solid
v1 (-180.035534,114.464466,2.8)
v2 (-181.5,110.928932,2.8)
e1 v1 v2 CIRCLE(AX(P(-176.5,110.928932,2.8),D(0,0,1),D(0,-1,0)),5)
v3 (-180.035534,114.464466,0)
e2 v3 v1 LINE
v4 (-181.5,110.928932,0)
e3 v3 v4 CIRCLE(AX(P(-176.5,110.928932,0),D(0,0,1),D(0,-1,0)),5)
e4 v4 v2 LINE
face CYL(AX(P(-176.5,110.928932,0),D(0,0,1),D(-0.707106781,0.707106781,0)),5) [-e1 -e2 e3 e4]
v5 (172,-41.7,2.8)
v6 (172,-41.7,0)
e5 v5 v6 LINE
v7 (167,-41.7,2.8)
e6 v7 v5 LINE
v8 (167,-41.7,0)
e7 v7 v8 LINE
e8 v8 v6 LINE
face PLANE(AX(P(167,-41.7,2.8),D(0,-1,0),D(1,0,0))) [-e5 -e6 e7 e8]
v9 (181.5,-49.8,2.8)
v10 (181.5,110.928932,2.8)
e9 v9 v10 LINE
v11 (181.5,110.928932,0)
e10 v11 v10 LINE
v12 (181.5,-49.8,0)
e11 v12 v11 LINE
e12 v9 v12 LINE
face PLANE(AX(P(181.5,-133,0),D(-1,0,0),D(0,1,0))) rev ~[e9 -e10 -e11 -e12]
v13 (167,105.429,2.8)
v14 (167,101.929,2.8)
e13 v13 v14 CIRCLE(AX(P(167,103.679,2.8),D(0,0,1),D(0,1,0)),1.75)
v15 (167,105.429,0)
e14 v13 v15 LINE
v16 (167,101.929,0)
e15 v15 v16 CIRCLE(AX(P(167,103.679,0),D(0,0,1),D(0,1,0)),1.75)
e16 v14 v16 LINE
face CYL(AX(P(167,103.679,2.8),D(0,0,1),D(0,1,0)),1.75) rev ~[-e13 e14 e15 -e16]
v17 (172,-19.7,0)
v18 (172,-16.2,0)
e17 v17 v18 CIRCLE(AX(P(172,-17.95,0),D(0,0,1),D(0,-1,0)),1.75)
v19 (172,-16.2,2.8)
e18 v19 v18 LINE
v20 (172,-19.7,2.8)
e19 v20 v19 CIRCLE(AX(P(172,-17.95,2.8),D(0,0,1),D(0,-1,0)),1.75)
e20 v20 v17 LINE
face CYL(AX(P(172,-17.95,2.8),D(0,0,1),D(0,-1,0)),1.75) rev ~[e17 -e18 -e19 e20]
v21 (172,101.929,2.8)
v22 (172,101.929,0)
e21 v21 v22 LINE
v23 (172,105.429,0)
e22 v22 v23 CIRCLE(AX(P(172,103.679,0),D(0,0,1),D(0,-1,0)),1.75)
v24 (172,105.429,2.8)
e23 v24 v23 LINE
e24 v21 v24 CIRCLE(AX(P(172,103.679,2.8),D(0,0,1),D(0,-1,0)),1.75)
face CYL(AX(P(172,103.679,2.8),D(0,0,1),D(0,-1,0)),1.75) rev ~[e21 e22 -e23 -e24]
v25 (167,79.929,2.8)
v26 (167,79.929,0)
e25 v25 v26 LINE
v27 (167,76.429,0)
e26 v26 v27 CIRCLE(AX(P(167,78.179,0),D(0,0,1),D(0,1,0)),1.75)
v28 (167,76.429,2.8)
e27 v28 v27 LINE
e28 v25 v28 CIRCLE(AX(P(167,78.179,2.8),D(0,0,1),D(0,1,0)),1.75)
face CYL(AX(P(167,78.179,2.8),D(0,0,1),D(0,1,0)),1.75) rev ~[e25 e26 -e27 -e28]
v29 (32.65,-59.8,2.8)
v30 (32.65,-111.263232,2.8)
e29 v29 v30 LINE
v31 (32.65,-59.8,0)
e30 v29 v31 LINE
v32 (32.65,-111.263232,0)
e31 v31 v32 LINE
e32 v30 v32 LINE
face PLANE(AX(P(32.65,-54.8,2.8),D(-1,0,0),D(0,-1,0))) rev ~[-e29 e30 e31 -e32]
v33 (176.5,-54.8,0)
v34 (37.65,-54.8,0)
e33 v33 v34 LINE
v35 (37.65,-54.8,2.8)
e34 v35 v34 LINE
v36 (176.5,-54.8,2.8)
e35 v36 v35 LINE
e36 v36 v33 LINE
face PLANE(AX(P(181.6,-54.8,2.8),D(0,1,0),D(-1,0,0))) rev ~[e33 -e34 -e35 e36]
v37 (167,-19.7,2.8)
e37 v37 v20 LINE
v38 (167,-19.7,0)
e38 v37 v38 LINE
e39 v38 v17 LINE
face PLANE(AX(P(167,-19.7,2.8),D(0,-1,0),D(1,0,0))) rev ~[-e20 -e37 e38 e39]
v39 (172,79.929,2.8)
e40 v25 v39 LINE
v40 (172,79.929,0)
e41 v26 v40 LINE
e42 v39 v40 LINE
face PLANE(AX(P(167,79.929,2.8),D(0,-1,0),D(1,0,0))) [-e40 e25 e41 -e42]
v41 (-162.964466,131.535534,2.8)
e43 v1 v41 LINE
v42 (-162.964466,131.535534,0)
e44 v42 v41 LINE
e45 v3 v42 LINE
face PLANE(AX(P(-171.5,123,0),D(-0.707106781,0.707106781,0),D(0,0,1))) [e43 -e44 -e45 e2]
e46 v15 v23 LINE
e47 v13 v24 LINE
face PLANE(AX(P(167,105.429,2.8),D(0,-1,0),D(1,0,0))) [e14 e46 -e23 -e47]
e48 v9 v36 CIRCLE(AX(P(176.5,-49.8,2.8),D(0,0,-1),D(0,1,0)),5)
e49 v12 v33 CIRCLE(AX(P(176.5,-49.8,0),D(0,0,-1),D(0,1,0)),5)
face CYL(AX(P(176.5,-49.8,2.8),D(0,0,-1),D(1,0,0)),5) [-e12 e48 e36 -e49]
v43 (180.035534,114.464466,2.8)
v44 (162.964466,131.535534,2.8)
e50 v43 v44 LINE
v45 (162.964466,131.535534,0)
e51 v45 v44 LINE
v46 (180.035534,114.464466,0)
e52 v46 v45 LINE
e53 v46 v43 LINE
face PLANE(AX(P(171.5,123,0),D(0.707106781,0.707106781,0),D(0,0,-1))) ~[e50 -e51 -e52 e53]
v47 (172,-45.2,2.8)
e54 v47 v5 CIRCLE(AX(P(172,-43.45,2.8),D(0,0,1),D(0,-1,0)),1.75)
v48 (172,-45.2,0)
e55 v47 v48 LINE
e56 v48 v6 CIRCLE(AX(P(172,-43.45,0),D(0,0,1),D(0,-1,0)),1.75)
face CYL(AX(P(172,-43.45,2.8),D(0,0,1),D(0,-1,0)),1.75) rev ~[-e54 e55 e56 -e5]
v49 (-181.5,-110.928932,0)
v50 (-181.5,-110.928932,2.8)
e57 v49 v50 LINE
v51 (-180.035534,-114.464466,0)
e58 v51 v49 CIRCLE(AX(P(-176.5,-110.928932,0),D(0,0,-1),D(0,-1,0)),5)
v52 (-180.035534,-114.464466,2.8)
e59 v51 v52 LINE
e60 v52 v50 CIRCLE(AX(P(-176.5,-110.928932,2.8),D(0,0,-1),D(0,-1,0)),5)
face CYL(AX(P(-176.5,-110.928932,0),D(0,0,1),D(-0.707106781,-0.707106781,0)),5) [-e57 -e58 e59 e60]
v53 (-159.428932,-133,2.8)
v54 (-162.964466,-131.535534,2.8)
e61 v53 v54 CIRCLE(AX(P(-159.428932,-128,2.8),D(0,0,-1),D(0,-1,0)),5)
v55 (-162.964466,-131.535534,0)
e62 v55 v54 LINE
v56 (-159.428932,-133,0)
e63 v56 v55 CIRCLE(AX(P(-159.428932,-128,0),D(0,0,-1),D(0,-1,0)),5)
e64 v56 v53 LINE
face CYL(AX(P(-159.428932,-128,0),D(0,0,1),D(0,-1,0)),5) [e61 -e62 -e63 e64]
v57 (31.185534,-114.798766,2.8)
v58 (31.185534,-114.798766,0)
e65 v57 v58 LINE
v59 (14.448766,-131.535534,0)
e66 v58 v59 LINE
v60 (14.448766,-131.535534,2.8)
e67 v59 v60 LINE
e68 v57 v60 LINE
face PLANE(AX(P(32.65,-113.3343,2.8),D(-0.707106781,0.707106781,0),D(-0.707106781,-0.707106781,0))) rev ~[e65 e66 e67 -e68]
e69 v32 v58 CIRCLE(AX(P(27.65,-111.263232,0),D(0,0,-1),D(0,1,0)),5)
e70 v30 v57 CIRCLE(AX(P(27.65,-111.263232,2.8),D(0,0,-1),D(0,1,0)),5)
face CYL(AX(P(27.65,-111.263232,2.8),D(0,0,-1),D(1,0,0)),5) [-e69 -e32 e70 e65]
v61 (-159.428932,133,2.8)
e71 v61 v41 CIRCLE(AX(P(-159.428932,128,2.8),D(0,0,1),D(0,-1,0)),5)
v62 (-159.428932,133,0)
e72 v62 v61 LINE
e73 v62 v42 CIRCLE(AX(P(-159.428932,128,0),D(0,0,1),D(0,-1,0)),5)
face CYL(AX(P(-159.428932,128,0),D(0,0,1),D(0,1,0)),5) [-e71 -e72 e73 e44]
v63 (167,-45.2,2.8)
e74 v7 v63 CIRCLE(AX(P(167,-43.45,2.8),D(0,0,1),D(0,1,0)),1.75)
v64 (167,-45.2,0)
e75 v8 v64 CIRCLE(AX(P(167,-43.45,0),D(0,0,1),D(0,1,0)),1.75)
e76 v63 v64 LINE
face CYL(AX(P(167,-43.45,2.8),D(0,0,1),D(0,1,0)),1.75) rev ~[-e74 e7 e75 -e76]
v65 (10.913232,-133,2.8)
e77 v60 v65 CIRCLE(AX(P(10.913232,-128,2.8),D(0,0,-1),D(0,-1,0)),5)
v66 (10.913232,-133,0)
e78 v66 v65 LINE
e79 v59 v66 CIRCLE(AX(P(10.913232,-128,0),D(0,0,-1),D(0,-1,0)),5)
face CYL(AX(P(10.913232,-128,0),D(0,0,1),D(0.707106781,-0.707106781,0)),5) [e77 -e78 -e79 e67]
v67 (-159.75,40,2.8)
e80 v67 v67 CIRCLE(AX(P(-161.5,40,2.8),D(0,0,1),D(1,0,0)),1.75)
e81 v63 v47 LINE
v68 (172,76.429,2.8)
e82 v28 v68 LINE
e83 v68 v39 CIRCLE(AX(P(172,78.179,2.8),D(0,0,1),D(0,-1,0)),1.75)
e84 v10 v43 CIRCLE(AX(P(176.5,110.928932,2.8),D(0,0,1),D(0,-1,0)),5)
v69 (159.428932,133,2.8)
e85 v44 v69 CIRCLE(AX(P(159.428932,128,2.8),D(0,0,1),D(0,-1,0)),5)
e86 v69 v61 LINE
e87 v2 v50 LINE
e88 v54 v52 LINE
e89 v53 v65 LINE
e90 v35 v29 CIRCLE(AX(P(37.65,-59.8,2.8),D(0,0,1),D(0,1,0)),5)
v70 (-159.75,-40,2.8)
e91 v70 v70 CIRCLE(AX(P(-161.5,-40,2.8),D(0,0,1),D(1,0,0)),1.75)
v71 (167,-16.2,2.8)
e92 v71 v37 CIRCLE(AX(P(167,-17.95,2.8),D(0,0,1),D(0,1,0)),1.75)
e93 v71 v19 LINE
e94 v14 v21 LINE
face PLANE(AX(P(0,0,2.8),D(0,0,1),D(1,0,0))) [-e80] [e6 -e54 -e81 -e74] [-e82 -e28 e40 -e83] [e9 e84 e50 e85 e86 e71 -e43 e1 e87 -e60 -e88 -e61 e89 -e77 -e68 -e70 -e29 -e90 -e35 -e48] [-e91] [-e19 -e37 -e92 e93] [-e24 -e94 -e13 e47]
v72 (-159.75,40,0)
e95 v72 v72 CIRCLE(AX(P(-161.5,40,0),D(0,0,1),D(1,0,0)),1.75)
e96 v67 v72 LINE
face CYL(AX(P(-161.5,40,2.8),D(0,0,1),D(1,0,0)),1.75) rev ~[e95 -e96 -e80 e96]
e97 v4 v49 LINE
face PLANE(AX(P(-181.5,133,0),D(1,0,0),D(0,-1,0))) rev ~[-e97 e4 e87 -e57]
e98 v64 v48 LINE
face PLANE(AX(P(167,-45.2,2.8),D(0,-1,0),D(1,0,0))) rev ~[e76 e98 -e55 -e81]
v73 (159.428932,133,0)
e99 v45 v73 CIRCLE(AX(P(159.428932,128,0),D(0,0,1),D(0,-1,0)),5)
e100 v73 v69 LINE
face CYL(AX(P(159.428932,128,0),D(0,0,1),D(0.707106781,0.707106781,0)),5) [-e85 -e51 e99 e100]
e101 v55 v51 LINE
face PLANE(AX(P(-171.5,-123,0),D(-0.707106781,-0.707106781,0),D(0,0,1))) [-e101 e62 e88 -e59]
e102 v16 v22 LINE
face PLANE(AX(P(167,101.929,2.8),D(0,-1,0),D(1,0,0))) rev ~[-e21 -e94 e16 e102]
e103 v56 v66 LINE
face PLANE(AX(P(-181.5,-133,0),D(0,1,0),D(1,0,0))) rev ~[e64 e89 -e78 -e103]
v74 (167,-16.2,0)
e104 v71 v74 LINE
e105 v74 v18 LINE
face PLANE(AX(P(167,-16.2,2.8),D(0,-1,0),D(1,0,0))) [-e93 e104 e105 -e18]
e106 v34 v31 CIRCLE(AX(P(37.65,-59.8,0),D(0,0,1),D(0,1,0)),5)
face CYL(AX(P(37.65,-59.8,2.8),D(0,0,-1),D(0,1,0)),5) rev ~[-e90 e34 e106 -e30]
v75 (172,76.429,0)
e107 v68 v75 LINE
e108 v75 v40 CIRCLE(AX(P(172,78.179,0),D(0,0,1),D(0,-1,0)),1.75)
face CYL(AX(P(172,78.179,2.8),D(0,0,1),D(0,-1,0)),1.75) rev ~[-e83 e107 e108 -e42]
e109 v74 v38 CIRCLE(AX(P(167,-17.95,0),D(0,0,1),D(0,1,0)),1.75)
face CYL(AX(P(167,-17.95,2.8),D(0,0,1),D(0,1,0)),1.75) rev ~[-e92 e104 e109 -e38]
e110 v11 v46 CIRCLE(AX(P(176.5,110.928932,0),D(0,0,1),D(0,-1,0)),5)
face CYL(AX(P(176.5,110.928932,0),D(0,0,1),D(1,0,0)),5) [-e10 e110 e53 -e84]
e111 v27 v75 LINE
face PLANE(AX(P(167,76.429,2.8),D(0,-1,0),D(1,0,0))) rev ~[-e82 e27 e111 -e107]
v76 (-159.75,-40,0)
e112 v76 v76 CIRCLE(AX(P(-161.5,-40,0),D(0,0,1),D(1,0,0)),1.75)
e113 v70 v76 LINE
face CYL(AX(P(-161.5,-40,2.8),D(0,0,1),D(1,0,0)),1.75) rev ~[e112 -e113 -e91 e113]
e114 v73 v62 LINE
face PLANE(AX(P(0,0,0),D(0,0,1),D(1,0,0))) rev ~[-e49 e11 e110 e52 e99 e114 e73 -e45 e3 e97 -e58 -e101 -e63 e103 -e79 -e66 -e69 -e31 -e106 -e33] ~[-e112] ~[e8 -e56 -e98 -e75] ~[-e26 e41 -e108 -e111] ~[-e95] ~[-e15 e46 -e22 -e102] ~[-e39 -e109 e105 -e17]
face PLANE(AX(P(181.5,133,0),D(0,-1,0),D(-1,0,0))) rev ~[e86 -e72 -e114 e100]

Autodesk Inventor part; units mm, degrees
ref_plane "YZ Plane" through (0, 0, 0) normal (1, 0, 0) x (0, 1, 0)
ref_plane "XZ Plane" through (0, 0, 0) normal (0, 1, 0) x (-1, 0, 0)
ref_plane "XY Plane" through (0, 0, 0) normal (0, 0, 1) x (1, 0, 0)
sketch "TFT LCD Touch Screen" plane through (0, 0, 0) normal (0, 0, 1) x (1, 0, 0)
  line L0 (-55, 32.5) -> (55, 32.5)
  line L1 (55, 32.5) -> (55, -32.5)
  line L2 (55, -32.5) -> (-55, -32.5)
  line L3 (-55, -32.5) -> (-55, 32.5)
  circle A0 centre (-51, 28.5) radius 1.5
  circle A1 centre (-51, -28.5) radius 1.5
  circle A2 centre (51, -28.5) radius 1.5
  circle A3 centre (51, 28.5) radius 1.5
  line L4 (-40, 29) -> (40, 29)
  line L5 (40, 29) -> (40, -29)
  line L6 (40, -29) -> (-40, -29)
  line L7 (-40, -29) -> (-40, 29)
  point P0 (0.75, 3.075)
  point P1 (0, 32.5)
  point P2 (55, 0)
  point P3 (0, 29)
  point P4 (-40, 0)
  dimension "d9" = 110
  dimension "d10" = 65
  dimension "d11" = 3
  dimension "d12" = 57
  dimension "d13" = 102
  dimension "d14" = 4
  dimension "d15" = 4
  dimension "d16" = 80
  dimension "d17" = 58
sketch "Hinges Screw Holes" plane through (0, 0, 0) normal (0, 0, 1) x (1, 0, 0)
  arc A0 (172, 94.429) -> (172, 97.929) centre (172, 96.179) ccw
  arc A1 (172, 68.929) -> (172, 72.429) centre (172, 70.679) ccw
  arc A2 (172, -27.2) -> (172, -23.7) centre (172, -25.45) ccw
  arc A3 (172, -52.7) -> (172, -49.2) centre (172, -50.95) ccw
  arc A4 (167, 97.929) -> (167, 94.429) centre (167, 96.179) ccw
  arc A5 (167, 72.429) -> (167, 68.929) centre (167, 70.679) ccw
  arc A6 (167, -23.7) -> (167, -27.2) centre (167, -25.45) ccw
  arc A7 (167, -49.2) -> (167, -52.7) centre (167, -50.95) ccw
  line L0 (167, 97.929) -> (172, 97.929)
  line L1 (167, 94.429) -> (172, 94.429)
  line L2 (167, 72.429) -> (172, 72.429)
  line L3 (167, 68.929) -> (172, 68.929)
  line L4 (167, -23.7) -> (172, -23.7)
  line L5 (167, -27.2) -> (172, -27.2)
  line L6 (167, -49.2) -> (172, -49.2)
  line L7 (167, -52.7) -> (172, -52.7)
  point P0 (169.5, 0)
  point P1 (0, -7.5)
  dimension "d47" = 3.5
  dimension "d48" = 3.5
  dimension "d50" = 25.5
  dimension "d51" = 3.5
  dimension "d52" = 3.5
  dimension "d53" = 25.5
  dimension "d58" = 3.5
  dimension "d59" = 3.5
  dimension "d60" = 25.5
  dimension "d61" = 3.5
  dimension "d62" = 3.5
  dimension "d63" = 25.5
  dimension "d65" = 5
  dimension "d70" = 78.179
  dimension "d71" = 17.95
sketch "Door Shape" plane through (0, 0, 0) normal (0, 0, 1) x (1, 0, 0)
  line L0 (182, -55.7) -> (182, 113)
  line L1 (182, 113) -> (162, 133)
  line L2 (162, 133) -> (-162, 133)
  line L3 (-162, 133) -> (-182, 113)
  line L4 (-182, 113) -> (-182, -114)
  line L5 (-182, -114) -> (-162, -134)
  line L6 (-162, -134) -> (13.05, -134)
  line L7 (13.05, -134) -> (33.05, -114)
  line L8 (33.05, -114) -> (33.05, -55.7)
  line L9 (33.05, -55.7) -> (182, -55.7)
  line L10 (-161.8343, 132.6) -> (161.8343, 132.6)
  line L11 (161.8343, 132.6) -> (181.6, 112.8343)
  line L12 (181.6, 112.8343) -> (181.6, -55.3)
  line L13 (181.6, -55.3) -> (32.65, -55.3)
  line L14 (32.65, -55.3) -> (32.65, -113.8343)
  line L15 (32.65, -113.8343) -> (12.8843, -133.6)
  line L16 (12.8843, -133.6) -> (-161.8343, -133.6)
  line L17 (-161.8343, -133.6) -> (-181.6, -113.8343)
  line L18 (-181.6, -113.8343) -> (-181.6, 112.8343)
  line L19 (-181.6, 112.8343) -> (-161.8343, 132.6)
  line L20 (12.8843, -133.6) -> (181.6, -133.6)
  line L21 (181.6, -133.6) -> (181.6, -55.3)
  point P0 (-8.285, -11.54)
  dimension "d79" = 0.4
sketch "Sketch1" plane through (0, 0, 0) normal (0, 0, 1) x (1, 0, 0)
  line L0 (-182, 133.5) -> (182, 133.5)
  line L1 (182, 133.5) -> (182, -133.5)
  line L2 (182, -133.5) -> (-182, -133.5)
  line L3 (-182, -133.5) -> (-182, 133.5)
  line L4 (181.5, 133) -> (-181.5, 133)
  line L5 (-181.5, 133) -> (-181.5, -133)
  line L6 (-181.5, -133) -> (181.5, -133)
  line L7 (181.5, -133) -> (181.5, 133)
  point P0 (0, 0)
  point P1 (0, 133.5)
  point P2 (-181.5, 0)
  dimension "d0" = 364
  dimension "d1" = 267
  dimension "d4" = 0.5
extrude "Extrusion1" add sketch "Sketch1" along normal blind 2.8 contours L7 L6 L5 L4
chamfer "Chamfer1" distance 20 angle 45 4 edges at (-181.5, -133, 1.4) (-181.5, 133, 1.4) (181.5, -133, 1.4) (181.5, 133, 1.4)
fillet "Fillet1" radius 5 8 edges at (-161.5, -133, 1.4) (161.5, -133, 1.4) (181.5, -113, 1.4) (181.5, 113, 1.4) (161.5, 133, 1.4) (-161.5, 133, 1.4) (-181.5, 113, 1.4) (-181.5, -113, 1.4)
sketch "Sketch6" plane through (0, 0, 2.8) normal (0, 0, 1) x (1, 0, 0)
  line L0 (181.5, -110.9289) -> (181.5, 110.9289) projected
  arc A0 (172, 101.929) -> (172, 105.429) centre (172, 103.679) ccw
  arc A1 (172, 76.429) -> (172, 79.929) centre (172, 78.179) ccw
  arc A2 (172, -19.7) -> (172, -16.2) centre (172, -17.95) ccw
  arc A3 (172, -45.2) -> (172, -41.7) centre (172, -43.45) ccw
  arc A4 (167, 105.429) -> (167, 101.929) centre (167, 103.679) ccw
  arc A5 (167, 79.929) -> (167, 76.429) centre (167, 78.179) ccw
  arc A6 (167, -16.2) -> (167, -19.7) centre (167, -17.95) ccw
  arc A7 (167, -41.7) -> (167, -45.2) centre (167, -43.45) ccw
  line L1 (167, 105.429) -> (172, 105.429)
  line L2 (167, 101.929) -> (172, 101.929)
  line L3 (167, 79.929) -> (172, 79.929)
  line L4 (167, 76.429) -> (172, 76.429)
  line L5 (167, -16.2) -> (172, -16.2)
  line L6 (167, -19.7) -> (172, -19.7)
  line L7 (167, -41.7) -> (172, -41.7)
  line L8 (167, -45.2) -> (172, -45.2)
  point P0 (0, 0)
  dimension "d68" = 9.5
  dimension "d69" = 9.5
  dimension "d72" = 78.179
extrude "Extrusion5" cut sketch "Sketch6" against normal blind 10
sketch "Sketch7" plane through (0, 0, 2.8) normal (0, 0, 1) x (1, 0, 0)
  circle A0 centre (-161.5, 40) radius 1.75
  circle A1 centre (-161.5, -40) radius 1.75
  line L0 (-181.5, 110.9289) -> (-181.5, -110.9289) projected
  point P0 (0, 0)
  dimension "d73" = 3.5
  dimension "d74" = 80
  dimension "d75" = 40
  dimension "d76" = 20
extrude "Extrusion6" cut sketch "Sketch7" against normal blind 18.5
sketch "Sketch8" plane through (0, 0, 2.8) normal (0, 0, 1) x (1, 0, 0)
  line L0 (-181.5, 110.9289) -> (-181.5, -110.9289) projected
  line L1 (159.4289, 133) -> (-159.4289, 133) projected
  line L2 (182, -55.2) -> (182, 113.5)
  line L3 (182, 113.5) -> (162, 133.5)
  line L4 (162, 133.5) -> (-162, 133.5)
  line L5 (-162, 133.5) -> (-182, 113.5)
  line L6 (-182, 113.5) -> (-182, -113.5)
  line L7 (-182, -113.5) -> (-162, -133.5)
  line L8 (-162, -133.5) -> (13.05, -133.5)
  line L9 (13.05, -133.5) -> (33.05, -113.5)
  line L10 (33.05, -113.5) -> (33.05, -55.2)
  line L11 (33.05, -55.2) -> (182, -55.2)
  line L12 (-161.8343, 133.1) -> (161.8343, 133.1)
  line L13 (161.8343, 133.1) -> (181.6, 113.3343)
  line L14 (181.6, 113.3343) -> (181.6, -54.8)
  line L15 (181.6, -54.8) -> (32.65, -54.8)
  line L16 (32.65, -54.8) -> (32.65, -113.3343)
  line L17 (32.65, -113.3343) -> (12.8843, -133.1)
  line L18 (12.8843, -133.1) -> (-161.8343, -133.1)
  line L19 (-161.8343, -133.1) -> (-181.6, -113.3343)
  line L20 (-181.6, -113.3343) -> (-181.6, 113.3343)
  line L21 (-181.6, 113.3343) -> (-161.8343, 133.1)
  line L22 (12.8843, -133.1) -> (181.6, -133.1)
  line L23 (181.6, -133.1) -> (181.6, -54.8)
  point P0 (0, 0)
  point P1 (-182, 0)
  point P2 (-181.5, 0)
  point P3 (0, 133)
  point P4 (0, 133.5)
extrude "Extrusion7" cut sketch "Sketch8" against normal blind 18.5 contours L23 L22 L9 L10 L11 | L11 L10 L9 L22 L17 L16 L15 L23
fillet "Fillet3" radius 5 4 edges at (12.9843, -133, 1.4) (32.65, -113.3343, 1.4) (32.65, -54.8, 1.4) (181.5, -54.8, 1.4)
equation "\"d75\" = 0.5 * d74"
equation "\"d14\" = -0.5 * d12 + 0.5 * d10"
equation "\"d15\" = -0.5 * d13 + 0.5 * d9"
properties part number "Clear Front Door 2" material "Glass"
